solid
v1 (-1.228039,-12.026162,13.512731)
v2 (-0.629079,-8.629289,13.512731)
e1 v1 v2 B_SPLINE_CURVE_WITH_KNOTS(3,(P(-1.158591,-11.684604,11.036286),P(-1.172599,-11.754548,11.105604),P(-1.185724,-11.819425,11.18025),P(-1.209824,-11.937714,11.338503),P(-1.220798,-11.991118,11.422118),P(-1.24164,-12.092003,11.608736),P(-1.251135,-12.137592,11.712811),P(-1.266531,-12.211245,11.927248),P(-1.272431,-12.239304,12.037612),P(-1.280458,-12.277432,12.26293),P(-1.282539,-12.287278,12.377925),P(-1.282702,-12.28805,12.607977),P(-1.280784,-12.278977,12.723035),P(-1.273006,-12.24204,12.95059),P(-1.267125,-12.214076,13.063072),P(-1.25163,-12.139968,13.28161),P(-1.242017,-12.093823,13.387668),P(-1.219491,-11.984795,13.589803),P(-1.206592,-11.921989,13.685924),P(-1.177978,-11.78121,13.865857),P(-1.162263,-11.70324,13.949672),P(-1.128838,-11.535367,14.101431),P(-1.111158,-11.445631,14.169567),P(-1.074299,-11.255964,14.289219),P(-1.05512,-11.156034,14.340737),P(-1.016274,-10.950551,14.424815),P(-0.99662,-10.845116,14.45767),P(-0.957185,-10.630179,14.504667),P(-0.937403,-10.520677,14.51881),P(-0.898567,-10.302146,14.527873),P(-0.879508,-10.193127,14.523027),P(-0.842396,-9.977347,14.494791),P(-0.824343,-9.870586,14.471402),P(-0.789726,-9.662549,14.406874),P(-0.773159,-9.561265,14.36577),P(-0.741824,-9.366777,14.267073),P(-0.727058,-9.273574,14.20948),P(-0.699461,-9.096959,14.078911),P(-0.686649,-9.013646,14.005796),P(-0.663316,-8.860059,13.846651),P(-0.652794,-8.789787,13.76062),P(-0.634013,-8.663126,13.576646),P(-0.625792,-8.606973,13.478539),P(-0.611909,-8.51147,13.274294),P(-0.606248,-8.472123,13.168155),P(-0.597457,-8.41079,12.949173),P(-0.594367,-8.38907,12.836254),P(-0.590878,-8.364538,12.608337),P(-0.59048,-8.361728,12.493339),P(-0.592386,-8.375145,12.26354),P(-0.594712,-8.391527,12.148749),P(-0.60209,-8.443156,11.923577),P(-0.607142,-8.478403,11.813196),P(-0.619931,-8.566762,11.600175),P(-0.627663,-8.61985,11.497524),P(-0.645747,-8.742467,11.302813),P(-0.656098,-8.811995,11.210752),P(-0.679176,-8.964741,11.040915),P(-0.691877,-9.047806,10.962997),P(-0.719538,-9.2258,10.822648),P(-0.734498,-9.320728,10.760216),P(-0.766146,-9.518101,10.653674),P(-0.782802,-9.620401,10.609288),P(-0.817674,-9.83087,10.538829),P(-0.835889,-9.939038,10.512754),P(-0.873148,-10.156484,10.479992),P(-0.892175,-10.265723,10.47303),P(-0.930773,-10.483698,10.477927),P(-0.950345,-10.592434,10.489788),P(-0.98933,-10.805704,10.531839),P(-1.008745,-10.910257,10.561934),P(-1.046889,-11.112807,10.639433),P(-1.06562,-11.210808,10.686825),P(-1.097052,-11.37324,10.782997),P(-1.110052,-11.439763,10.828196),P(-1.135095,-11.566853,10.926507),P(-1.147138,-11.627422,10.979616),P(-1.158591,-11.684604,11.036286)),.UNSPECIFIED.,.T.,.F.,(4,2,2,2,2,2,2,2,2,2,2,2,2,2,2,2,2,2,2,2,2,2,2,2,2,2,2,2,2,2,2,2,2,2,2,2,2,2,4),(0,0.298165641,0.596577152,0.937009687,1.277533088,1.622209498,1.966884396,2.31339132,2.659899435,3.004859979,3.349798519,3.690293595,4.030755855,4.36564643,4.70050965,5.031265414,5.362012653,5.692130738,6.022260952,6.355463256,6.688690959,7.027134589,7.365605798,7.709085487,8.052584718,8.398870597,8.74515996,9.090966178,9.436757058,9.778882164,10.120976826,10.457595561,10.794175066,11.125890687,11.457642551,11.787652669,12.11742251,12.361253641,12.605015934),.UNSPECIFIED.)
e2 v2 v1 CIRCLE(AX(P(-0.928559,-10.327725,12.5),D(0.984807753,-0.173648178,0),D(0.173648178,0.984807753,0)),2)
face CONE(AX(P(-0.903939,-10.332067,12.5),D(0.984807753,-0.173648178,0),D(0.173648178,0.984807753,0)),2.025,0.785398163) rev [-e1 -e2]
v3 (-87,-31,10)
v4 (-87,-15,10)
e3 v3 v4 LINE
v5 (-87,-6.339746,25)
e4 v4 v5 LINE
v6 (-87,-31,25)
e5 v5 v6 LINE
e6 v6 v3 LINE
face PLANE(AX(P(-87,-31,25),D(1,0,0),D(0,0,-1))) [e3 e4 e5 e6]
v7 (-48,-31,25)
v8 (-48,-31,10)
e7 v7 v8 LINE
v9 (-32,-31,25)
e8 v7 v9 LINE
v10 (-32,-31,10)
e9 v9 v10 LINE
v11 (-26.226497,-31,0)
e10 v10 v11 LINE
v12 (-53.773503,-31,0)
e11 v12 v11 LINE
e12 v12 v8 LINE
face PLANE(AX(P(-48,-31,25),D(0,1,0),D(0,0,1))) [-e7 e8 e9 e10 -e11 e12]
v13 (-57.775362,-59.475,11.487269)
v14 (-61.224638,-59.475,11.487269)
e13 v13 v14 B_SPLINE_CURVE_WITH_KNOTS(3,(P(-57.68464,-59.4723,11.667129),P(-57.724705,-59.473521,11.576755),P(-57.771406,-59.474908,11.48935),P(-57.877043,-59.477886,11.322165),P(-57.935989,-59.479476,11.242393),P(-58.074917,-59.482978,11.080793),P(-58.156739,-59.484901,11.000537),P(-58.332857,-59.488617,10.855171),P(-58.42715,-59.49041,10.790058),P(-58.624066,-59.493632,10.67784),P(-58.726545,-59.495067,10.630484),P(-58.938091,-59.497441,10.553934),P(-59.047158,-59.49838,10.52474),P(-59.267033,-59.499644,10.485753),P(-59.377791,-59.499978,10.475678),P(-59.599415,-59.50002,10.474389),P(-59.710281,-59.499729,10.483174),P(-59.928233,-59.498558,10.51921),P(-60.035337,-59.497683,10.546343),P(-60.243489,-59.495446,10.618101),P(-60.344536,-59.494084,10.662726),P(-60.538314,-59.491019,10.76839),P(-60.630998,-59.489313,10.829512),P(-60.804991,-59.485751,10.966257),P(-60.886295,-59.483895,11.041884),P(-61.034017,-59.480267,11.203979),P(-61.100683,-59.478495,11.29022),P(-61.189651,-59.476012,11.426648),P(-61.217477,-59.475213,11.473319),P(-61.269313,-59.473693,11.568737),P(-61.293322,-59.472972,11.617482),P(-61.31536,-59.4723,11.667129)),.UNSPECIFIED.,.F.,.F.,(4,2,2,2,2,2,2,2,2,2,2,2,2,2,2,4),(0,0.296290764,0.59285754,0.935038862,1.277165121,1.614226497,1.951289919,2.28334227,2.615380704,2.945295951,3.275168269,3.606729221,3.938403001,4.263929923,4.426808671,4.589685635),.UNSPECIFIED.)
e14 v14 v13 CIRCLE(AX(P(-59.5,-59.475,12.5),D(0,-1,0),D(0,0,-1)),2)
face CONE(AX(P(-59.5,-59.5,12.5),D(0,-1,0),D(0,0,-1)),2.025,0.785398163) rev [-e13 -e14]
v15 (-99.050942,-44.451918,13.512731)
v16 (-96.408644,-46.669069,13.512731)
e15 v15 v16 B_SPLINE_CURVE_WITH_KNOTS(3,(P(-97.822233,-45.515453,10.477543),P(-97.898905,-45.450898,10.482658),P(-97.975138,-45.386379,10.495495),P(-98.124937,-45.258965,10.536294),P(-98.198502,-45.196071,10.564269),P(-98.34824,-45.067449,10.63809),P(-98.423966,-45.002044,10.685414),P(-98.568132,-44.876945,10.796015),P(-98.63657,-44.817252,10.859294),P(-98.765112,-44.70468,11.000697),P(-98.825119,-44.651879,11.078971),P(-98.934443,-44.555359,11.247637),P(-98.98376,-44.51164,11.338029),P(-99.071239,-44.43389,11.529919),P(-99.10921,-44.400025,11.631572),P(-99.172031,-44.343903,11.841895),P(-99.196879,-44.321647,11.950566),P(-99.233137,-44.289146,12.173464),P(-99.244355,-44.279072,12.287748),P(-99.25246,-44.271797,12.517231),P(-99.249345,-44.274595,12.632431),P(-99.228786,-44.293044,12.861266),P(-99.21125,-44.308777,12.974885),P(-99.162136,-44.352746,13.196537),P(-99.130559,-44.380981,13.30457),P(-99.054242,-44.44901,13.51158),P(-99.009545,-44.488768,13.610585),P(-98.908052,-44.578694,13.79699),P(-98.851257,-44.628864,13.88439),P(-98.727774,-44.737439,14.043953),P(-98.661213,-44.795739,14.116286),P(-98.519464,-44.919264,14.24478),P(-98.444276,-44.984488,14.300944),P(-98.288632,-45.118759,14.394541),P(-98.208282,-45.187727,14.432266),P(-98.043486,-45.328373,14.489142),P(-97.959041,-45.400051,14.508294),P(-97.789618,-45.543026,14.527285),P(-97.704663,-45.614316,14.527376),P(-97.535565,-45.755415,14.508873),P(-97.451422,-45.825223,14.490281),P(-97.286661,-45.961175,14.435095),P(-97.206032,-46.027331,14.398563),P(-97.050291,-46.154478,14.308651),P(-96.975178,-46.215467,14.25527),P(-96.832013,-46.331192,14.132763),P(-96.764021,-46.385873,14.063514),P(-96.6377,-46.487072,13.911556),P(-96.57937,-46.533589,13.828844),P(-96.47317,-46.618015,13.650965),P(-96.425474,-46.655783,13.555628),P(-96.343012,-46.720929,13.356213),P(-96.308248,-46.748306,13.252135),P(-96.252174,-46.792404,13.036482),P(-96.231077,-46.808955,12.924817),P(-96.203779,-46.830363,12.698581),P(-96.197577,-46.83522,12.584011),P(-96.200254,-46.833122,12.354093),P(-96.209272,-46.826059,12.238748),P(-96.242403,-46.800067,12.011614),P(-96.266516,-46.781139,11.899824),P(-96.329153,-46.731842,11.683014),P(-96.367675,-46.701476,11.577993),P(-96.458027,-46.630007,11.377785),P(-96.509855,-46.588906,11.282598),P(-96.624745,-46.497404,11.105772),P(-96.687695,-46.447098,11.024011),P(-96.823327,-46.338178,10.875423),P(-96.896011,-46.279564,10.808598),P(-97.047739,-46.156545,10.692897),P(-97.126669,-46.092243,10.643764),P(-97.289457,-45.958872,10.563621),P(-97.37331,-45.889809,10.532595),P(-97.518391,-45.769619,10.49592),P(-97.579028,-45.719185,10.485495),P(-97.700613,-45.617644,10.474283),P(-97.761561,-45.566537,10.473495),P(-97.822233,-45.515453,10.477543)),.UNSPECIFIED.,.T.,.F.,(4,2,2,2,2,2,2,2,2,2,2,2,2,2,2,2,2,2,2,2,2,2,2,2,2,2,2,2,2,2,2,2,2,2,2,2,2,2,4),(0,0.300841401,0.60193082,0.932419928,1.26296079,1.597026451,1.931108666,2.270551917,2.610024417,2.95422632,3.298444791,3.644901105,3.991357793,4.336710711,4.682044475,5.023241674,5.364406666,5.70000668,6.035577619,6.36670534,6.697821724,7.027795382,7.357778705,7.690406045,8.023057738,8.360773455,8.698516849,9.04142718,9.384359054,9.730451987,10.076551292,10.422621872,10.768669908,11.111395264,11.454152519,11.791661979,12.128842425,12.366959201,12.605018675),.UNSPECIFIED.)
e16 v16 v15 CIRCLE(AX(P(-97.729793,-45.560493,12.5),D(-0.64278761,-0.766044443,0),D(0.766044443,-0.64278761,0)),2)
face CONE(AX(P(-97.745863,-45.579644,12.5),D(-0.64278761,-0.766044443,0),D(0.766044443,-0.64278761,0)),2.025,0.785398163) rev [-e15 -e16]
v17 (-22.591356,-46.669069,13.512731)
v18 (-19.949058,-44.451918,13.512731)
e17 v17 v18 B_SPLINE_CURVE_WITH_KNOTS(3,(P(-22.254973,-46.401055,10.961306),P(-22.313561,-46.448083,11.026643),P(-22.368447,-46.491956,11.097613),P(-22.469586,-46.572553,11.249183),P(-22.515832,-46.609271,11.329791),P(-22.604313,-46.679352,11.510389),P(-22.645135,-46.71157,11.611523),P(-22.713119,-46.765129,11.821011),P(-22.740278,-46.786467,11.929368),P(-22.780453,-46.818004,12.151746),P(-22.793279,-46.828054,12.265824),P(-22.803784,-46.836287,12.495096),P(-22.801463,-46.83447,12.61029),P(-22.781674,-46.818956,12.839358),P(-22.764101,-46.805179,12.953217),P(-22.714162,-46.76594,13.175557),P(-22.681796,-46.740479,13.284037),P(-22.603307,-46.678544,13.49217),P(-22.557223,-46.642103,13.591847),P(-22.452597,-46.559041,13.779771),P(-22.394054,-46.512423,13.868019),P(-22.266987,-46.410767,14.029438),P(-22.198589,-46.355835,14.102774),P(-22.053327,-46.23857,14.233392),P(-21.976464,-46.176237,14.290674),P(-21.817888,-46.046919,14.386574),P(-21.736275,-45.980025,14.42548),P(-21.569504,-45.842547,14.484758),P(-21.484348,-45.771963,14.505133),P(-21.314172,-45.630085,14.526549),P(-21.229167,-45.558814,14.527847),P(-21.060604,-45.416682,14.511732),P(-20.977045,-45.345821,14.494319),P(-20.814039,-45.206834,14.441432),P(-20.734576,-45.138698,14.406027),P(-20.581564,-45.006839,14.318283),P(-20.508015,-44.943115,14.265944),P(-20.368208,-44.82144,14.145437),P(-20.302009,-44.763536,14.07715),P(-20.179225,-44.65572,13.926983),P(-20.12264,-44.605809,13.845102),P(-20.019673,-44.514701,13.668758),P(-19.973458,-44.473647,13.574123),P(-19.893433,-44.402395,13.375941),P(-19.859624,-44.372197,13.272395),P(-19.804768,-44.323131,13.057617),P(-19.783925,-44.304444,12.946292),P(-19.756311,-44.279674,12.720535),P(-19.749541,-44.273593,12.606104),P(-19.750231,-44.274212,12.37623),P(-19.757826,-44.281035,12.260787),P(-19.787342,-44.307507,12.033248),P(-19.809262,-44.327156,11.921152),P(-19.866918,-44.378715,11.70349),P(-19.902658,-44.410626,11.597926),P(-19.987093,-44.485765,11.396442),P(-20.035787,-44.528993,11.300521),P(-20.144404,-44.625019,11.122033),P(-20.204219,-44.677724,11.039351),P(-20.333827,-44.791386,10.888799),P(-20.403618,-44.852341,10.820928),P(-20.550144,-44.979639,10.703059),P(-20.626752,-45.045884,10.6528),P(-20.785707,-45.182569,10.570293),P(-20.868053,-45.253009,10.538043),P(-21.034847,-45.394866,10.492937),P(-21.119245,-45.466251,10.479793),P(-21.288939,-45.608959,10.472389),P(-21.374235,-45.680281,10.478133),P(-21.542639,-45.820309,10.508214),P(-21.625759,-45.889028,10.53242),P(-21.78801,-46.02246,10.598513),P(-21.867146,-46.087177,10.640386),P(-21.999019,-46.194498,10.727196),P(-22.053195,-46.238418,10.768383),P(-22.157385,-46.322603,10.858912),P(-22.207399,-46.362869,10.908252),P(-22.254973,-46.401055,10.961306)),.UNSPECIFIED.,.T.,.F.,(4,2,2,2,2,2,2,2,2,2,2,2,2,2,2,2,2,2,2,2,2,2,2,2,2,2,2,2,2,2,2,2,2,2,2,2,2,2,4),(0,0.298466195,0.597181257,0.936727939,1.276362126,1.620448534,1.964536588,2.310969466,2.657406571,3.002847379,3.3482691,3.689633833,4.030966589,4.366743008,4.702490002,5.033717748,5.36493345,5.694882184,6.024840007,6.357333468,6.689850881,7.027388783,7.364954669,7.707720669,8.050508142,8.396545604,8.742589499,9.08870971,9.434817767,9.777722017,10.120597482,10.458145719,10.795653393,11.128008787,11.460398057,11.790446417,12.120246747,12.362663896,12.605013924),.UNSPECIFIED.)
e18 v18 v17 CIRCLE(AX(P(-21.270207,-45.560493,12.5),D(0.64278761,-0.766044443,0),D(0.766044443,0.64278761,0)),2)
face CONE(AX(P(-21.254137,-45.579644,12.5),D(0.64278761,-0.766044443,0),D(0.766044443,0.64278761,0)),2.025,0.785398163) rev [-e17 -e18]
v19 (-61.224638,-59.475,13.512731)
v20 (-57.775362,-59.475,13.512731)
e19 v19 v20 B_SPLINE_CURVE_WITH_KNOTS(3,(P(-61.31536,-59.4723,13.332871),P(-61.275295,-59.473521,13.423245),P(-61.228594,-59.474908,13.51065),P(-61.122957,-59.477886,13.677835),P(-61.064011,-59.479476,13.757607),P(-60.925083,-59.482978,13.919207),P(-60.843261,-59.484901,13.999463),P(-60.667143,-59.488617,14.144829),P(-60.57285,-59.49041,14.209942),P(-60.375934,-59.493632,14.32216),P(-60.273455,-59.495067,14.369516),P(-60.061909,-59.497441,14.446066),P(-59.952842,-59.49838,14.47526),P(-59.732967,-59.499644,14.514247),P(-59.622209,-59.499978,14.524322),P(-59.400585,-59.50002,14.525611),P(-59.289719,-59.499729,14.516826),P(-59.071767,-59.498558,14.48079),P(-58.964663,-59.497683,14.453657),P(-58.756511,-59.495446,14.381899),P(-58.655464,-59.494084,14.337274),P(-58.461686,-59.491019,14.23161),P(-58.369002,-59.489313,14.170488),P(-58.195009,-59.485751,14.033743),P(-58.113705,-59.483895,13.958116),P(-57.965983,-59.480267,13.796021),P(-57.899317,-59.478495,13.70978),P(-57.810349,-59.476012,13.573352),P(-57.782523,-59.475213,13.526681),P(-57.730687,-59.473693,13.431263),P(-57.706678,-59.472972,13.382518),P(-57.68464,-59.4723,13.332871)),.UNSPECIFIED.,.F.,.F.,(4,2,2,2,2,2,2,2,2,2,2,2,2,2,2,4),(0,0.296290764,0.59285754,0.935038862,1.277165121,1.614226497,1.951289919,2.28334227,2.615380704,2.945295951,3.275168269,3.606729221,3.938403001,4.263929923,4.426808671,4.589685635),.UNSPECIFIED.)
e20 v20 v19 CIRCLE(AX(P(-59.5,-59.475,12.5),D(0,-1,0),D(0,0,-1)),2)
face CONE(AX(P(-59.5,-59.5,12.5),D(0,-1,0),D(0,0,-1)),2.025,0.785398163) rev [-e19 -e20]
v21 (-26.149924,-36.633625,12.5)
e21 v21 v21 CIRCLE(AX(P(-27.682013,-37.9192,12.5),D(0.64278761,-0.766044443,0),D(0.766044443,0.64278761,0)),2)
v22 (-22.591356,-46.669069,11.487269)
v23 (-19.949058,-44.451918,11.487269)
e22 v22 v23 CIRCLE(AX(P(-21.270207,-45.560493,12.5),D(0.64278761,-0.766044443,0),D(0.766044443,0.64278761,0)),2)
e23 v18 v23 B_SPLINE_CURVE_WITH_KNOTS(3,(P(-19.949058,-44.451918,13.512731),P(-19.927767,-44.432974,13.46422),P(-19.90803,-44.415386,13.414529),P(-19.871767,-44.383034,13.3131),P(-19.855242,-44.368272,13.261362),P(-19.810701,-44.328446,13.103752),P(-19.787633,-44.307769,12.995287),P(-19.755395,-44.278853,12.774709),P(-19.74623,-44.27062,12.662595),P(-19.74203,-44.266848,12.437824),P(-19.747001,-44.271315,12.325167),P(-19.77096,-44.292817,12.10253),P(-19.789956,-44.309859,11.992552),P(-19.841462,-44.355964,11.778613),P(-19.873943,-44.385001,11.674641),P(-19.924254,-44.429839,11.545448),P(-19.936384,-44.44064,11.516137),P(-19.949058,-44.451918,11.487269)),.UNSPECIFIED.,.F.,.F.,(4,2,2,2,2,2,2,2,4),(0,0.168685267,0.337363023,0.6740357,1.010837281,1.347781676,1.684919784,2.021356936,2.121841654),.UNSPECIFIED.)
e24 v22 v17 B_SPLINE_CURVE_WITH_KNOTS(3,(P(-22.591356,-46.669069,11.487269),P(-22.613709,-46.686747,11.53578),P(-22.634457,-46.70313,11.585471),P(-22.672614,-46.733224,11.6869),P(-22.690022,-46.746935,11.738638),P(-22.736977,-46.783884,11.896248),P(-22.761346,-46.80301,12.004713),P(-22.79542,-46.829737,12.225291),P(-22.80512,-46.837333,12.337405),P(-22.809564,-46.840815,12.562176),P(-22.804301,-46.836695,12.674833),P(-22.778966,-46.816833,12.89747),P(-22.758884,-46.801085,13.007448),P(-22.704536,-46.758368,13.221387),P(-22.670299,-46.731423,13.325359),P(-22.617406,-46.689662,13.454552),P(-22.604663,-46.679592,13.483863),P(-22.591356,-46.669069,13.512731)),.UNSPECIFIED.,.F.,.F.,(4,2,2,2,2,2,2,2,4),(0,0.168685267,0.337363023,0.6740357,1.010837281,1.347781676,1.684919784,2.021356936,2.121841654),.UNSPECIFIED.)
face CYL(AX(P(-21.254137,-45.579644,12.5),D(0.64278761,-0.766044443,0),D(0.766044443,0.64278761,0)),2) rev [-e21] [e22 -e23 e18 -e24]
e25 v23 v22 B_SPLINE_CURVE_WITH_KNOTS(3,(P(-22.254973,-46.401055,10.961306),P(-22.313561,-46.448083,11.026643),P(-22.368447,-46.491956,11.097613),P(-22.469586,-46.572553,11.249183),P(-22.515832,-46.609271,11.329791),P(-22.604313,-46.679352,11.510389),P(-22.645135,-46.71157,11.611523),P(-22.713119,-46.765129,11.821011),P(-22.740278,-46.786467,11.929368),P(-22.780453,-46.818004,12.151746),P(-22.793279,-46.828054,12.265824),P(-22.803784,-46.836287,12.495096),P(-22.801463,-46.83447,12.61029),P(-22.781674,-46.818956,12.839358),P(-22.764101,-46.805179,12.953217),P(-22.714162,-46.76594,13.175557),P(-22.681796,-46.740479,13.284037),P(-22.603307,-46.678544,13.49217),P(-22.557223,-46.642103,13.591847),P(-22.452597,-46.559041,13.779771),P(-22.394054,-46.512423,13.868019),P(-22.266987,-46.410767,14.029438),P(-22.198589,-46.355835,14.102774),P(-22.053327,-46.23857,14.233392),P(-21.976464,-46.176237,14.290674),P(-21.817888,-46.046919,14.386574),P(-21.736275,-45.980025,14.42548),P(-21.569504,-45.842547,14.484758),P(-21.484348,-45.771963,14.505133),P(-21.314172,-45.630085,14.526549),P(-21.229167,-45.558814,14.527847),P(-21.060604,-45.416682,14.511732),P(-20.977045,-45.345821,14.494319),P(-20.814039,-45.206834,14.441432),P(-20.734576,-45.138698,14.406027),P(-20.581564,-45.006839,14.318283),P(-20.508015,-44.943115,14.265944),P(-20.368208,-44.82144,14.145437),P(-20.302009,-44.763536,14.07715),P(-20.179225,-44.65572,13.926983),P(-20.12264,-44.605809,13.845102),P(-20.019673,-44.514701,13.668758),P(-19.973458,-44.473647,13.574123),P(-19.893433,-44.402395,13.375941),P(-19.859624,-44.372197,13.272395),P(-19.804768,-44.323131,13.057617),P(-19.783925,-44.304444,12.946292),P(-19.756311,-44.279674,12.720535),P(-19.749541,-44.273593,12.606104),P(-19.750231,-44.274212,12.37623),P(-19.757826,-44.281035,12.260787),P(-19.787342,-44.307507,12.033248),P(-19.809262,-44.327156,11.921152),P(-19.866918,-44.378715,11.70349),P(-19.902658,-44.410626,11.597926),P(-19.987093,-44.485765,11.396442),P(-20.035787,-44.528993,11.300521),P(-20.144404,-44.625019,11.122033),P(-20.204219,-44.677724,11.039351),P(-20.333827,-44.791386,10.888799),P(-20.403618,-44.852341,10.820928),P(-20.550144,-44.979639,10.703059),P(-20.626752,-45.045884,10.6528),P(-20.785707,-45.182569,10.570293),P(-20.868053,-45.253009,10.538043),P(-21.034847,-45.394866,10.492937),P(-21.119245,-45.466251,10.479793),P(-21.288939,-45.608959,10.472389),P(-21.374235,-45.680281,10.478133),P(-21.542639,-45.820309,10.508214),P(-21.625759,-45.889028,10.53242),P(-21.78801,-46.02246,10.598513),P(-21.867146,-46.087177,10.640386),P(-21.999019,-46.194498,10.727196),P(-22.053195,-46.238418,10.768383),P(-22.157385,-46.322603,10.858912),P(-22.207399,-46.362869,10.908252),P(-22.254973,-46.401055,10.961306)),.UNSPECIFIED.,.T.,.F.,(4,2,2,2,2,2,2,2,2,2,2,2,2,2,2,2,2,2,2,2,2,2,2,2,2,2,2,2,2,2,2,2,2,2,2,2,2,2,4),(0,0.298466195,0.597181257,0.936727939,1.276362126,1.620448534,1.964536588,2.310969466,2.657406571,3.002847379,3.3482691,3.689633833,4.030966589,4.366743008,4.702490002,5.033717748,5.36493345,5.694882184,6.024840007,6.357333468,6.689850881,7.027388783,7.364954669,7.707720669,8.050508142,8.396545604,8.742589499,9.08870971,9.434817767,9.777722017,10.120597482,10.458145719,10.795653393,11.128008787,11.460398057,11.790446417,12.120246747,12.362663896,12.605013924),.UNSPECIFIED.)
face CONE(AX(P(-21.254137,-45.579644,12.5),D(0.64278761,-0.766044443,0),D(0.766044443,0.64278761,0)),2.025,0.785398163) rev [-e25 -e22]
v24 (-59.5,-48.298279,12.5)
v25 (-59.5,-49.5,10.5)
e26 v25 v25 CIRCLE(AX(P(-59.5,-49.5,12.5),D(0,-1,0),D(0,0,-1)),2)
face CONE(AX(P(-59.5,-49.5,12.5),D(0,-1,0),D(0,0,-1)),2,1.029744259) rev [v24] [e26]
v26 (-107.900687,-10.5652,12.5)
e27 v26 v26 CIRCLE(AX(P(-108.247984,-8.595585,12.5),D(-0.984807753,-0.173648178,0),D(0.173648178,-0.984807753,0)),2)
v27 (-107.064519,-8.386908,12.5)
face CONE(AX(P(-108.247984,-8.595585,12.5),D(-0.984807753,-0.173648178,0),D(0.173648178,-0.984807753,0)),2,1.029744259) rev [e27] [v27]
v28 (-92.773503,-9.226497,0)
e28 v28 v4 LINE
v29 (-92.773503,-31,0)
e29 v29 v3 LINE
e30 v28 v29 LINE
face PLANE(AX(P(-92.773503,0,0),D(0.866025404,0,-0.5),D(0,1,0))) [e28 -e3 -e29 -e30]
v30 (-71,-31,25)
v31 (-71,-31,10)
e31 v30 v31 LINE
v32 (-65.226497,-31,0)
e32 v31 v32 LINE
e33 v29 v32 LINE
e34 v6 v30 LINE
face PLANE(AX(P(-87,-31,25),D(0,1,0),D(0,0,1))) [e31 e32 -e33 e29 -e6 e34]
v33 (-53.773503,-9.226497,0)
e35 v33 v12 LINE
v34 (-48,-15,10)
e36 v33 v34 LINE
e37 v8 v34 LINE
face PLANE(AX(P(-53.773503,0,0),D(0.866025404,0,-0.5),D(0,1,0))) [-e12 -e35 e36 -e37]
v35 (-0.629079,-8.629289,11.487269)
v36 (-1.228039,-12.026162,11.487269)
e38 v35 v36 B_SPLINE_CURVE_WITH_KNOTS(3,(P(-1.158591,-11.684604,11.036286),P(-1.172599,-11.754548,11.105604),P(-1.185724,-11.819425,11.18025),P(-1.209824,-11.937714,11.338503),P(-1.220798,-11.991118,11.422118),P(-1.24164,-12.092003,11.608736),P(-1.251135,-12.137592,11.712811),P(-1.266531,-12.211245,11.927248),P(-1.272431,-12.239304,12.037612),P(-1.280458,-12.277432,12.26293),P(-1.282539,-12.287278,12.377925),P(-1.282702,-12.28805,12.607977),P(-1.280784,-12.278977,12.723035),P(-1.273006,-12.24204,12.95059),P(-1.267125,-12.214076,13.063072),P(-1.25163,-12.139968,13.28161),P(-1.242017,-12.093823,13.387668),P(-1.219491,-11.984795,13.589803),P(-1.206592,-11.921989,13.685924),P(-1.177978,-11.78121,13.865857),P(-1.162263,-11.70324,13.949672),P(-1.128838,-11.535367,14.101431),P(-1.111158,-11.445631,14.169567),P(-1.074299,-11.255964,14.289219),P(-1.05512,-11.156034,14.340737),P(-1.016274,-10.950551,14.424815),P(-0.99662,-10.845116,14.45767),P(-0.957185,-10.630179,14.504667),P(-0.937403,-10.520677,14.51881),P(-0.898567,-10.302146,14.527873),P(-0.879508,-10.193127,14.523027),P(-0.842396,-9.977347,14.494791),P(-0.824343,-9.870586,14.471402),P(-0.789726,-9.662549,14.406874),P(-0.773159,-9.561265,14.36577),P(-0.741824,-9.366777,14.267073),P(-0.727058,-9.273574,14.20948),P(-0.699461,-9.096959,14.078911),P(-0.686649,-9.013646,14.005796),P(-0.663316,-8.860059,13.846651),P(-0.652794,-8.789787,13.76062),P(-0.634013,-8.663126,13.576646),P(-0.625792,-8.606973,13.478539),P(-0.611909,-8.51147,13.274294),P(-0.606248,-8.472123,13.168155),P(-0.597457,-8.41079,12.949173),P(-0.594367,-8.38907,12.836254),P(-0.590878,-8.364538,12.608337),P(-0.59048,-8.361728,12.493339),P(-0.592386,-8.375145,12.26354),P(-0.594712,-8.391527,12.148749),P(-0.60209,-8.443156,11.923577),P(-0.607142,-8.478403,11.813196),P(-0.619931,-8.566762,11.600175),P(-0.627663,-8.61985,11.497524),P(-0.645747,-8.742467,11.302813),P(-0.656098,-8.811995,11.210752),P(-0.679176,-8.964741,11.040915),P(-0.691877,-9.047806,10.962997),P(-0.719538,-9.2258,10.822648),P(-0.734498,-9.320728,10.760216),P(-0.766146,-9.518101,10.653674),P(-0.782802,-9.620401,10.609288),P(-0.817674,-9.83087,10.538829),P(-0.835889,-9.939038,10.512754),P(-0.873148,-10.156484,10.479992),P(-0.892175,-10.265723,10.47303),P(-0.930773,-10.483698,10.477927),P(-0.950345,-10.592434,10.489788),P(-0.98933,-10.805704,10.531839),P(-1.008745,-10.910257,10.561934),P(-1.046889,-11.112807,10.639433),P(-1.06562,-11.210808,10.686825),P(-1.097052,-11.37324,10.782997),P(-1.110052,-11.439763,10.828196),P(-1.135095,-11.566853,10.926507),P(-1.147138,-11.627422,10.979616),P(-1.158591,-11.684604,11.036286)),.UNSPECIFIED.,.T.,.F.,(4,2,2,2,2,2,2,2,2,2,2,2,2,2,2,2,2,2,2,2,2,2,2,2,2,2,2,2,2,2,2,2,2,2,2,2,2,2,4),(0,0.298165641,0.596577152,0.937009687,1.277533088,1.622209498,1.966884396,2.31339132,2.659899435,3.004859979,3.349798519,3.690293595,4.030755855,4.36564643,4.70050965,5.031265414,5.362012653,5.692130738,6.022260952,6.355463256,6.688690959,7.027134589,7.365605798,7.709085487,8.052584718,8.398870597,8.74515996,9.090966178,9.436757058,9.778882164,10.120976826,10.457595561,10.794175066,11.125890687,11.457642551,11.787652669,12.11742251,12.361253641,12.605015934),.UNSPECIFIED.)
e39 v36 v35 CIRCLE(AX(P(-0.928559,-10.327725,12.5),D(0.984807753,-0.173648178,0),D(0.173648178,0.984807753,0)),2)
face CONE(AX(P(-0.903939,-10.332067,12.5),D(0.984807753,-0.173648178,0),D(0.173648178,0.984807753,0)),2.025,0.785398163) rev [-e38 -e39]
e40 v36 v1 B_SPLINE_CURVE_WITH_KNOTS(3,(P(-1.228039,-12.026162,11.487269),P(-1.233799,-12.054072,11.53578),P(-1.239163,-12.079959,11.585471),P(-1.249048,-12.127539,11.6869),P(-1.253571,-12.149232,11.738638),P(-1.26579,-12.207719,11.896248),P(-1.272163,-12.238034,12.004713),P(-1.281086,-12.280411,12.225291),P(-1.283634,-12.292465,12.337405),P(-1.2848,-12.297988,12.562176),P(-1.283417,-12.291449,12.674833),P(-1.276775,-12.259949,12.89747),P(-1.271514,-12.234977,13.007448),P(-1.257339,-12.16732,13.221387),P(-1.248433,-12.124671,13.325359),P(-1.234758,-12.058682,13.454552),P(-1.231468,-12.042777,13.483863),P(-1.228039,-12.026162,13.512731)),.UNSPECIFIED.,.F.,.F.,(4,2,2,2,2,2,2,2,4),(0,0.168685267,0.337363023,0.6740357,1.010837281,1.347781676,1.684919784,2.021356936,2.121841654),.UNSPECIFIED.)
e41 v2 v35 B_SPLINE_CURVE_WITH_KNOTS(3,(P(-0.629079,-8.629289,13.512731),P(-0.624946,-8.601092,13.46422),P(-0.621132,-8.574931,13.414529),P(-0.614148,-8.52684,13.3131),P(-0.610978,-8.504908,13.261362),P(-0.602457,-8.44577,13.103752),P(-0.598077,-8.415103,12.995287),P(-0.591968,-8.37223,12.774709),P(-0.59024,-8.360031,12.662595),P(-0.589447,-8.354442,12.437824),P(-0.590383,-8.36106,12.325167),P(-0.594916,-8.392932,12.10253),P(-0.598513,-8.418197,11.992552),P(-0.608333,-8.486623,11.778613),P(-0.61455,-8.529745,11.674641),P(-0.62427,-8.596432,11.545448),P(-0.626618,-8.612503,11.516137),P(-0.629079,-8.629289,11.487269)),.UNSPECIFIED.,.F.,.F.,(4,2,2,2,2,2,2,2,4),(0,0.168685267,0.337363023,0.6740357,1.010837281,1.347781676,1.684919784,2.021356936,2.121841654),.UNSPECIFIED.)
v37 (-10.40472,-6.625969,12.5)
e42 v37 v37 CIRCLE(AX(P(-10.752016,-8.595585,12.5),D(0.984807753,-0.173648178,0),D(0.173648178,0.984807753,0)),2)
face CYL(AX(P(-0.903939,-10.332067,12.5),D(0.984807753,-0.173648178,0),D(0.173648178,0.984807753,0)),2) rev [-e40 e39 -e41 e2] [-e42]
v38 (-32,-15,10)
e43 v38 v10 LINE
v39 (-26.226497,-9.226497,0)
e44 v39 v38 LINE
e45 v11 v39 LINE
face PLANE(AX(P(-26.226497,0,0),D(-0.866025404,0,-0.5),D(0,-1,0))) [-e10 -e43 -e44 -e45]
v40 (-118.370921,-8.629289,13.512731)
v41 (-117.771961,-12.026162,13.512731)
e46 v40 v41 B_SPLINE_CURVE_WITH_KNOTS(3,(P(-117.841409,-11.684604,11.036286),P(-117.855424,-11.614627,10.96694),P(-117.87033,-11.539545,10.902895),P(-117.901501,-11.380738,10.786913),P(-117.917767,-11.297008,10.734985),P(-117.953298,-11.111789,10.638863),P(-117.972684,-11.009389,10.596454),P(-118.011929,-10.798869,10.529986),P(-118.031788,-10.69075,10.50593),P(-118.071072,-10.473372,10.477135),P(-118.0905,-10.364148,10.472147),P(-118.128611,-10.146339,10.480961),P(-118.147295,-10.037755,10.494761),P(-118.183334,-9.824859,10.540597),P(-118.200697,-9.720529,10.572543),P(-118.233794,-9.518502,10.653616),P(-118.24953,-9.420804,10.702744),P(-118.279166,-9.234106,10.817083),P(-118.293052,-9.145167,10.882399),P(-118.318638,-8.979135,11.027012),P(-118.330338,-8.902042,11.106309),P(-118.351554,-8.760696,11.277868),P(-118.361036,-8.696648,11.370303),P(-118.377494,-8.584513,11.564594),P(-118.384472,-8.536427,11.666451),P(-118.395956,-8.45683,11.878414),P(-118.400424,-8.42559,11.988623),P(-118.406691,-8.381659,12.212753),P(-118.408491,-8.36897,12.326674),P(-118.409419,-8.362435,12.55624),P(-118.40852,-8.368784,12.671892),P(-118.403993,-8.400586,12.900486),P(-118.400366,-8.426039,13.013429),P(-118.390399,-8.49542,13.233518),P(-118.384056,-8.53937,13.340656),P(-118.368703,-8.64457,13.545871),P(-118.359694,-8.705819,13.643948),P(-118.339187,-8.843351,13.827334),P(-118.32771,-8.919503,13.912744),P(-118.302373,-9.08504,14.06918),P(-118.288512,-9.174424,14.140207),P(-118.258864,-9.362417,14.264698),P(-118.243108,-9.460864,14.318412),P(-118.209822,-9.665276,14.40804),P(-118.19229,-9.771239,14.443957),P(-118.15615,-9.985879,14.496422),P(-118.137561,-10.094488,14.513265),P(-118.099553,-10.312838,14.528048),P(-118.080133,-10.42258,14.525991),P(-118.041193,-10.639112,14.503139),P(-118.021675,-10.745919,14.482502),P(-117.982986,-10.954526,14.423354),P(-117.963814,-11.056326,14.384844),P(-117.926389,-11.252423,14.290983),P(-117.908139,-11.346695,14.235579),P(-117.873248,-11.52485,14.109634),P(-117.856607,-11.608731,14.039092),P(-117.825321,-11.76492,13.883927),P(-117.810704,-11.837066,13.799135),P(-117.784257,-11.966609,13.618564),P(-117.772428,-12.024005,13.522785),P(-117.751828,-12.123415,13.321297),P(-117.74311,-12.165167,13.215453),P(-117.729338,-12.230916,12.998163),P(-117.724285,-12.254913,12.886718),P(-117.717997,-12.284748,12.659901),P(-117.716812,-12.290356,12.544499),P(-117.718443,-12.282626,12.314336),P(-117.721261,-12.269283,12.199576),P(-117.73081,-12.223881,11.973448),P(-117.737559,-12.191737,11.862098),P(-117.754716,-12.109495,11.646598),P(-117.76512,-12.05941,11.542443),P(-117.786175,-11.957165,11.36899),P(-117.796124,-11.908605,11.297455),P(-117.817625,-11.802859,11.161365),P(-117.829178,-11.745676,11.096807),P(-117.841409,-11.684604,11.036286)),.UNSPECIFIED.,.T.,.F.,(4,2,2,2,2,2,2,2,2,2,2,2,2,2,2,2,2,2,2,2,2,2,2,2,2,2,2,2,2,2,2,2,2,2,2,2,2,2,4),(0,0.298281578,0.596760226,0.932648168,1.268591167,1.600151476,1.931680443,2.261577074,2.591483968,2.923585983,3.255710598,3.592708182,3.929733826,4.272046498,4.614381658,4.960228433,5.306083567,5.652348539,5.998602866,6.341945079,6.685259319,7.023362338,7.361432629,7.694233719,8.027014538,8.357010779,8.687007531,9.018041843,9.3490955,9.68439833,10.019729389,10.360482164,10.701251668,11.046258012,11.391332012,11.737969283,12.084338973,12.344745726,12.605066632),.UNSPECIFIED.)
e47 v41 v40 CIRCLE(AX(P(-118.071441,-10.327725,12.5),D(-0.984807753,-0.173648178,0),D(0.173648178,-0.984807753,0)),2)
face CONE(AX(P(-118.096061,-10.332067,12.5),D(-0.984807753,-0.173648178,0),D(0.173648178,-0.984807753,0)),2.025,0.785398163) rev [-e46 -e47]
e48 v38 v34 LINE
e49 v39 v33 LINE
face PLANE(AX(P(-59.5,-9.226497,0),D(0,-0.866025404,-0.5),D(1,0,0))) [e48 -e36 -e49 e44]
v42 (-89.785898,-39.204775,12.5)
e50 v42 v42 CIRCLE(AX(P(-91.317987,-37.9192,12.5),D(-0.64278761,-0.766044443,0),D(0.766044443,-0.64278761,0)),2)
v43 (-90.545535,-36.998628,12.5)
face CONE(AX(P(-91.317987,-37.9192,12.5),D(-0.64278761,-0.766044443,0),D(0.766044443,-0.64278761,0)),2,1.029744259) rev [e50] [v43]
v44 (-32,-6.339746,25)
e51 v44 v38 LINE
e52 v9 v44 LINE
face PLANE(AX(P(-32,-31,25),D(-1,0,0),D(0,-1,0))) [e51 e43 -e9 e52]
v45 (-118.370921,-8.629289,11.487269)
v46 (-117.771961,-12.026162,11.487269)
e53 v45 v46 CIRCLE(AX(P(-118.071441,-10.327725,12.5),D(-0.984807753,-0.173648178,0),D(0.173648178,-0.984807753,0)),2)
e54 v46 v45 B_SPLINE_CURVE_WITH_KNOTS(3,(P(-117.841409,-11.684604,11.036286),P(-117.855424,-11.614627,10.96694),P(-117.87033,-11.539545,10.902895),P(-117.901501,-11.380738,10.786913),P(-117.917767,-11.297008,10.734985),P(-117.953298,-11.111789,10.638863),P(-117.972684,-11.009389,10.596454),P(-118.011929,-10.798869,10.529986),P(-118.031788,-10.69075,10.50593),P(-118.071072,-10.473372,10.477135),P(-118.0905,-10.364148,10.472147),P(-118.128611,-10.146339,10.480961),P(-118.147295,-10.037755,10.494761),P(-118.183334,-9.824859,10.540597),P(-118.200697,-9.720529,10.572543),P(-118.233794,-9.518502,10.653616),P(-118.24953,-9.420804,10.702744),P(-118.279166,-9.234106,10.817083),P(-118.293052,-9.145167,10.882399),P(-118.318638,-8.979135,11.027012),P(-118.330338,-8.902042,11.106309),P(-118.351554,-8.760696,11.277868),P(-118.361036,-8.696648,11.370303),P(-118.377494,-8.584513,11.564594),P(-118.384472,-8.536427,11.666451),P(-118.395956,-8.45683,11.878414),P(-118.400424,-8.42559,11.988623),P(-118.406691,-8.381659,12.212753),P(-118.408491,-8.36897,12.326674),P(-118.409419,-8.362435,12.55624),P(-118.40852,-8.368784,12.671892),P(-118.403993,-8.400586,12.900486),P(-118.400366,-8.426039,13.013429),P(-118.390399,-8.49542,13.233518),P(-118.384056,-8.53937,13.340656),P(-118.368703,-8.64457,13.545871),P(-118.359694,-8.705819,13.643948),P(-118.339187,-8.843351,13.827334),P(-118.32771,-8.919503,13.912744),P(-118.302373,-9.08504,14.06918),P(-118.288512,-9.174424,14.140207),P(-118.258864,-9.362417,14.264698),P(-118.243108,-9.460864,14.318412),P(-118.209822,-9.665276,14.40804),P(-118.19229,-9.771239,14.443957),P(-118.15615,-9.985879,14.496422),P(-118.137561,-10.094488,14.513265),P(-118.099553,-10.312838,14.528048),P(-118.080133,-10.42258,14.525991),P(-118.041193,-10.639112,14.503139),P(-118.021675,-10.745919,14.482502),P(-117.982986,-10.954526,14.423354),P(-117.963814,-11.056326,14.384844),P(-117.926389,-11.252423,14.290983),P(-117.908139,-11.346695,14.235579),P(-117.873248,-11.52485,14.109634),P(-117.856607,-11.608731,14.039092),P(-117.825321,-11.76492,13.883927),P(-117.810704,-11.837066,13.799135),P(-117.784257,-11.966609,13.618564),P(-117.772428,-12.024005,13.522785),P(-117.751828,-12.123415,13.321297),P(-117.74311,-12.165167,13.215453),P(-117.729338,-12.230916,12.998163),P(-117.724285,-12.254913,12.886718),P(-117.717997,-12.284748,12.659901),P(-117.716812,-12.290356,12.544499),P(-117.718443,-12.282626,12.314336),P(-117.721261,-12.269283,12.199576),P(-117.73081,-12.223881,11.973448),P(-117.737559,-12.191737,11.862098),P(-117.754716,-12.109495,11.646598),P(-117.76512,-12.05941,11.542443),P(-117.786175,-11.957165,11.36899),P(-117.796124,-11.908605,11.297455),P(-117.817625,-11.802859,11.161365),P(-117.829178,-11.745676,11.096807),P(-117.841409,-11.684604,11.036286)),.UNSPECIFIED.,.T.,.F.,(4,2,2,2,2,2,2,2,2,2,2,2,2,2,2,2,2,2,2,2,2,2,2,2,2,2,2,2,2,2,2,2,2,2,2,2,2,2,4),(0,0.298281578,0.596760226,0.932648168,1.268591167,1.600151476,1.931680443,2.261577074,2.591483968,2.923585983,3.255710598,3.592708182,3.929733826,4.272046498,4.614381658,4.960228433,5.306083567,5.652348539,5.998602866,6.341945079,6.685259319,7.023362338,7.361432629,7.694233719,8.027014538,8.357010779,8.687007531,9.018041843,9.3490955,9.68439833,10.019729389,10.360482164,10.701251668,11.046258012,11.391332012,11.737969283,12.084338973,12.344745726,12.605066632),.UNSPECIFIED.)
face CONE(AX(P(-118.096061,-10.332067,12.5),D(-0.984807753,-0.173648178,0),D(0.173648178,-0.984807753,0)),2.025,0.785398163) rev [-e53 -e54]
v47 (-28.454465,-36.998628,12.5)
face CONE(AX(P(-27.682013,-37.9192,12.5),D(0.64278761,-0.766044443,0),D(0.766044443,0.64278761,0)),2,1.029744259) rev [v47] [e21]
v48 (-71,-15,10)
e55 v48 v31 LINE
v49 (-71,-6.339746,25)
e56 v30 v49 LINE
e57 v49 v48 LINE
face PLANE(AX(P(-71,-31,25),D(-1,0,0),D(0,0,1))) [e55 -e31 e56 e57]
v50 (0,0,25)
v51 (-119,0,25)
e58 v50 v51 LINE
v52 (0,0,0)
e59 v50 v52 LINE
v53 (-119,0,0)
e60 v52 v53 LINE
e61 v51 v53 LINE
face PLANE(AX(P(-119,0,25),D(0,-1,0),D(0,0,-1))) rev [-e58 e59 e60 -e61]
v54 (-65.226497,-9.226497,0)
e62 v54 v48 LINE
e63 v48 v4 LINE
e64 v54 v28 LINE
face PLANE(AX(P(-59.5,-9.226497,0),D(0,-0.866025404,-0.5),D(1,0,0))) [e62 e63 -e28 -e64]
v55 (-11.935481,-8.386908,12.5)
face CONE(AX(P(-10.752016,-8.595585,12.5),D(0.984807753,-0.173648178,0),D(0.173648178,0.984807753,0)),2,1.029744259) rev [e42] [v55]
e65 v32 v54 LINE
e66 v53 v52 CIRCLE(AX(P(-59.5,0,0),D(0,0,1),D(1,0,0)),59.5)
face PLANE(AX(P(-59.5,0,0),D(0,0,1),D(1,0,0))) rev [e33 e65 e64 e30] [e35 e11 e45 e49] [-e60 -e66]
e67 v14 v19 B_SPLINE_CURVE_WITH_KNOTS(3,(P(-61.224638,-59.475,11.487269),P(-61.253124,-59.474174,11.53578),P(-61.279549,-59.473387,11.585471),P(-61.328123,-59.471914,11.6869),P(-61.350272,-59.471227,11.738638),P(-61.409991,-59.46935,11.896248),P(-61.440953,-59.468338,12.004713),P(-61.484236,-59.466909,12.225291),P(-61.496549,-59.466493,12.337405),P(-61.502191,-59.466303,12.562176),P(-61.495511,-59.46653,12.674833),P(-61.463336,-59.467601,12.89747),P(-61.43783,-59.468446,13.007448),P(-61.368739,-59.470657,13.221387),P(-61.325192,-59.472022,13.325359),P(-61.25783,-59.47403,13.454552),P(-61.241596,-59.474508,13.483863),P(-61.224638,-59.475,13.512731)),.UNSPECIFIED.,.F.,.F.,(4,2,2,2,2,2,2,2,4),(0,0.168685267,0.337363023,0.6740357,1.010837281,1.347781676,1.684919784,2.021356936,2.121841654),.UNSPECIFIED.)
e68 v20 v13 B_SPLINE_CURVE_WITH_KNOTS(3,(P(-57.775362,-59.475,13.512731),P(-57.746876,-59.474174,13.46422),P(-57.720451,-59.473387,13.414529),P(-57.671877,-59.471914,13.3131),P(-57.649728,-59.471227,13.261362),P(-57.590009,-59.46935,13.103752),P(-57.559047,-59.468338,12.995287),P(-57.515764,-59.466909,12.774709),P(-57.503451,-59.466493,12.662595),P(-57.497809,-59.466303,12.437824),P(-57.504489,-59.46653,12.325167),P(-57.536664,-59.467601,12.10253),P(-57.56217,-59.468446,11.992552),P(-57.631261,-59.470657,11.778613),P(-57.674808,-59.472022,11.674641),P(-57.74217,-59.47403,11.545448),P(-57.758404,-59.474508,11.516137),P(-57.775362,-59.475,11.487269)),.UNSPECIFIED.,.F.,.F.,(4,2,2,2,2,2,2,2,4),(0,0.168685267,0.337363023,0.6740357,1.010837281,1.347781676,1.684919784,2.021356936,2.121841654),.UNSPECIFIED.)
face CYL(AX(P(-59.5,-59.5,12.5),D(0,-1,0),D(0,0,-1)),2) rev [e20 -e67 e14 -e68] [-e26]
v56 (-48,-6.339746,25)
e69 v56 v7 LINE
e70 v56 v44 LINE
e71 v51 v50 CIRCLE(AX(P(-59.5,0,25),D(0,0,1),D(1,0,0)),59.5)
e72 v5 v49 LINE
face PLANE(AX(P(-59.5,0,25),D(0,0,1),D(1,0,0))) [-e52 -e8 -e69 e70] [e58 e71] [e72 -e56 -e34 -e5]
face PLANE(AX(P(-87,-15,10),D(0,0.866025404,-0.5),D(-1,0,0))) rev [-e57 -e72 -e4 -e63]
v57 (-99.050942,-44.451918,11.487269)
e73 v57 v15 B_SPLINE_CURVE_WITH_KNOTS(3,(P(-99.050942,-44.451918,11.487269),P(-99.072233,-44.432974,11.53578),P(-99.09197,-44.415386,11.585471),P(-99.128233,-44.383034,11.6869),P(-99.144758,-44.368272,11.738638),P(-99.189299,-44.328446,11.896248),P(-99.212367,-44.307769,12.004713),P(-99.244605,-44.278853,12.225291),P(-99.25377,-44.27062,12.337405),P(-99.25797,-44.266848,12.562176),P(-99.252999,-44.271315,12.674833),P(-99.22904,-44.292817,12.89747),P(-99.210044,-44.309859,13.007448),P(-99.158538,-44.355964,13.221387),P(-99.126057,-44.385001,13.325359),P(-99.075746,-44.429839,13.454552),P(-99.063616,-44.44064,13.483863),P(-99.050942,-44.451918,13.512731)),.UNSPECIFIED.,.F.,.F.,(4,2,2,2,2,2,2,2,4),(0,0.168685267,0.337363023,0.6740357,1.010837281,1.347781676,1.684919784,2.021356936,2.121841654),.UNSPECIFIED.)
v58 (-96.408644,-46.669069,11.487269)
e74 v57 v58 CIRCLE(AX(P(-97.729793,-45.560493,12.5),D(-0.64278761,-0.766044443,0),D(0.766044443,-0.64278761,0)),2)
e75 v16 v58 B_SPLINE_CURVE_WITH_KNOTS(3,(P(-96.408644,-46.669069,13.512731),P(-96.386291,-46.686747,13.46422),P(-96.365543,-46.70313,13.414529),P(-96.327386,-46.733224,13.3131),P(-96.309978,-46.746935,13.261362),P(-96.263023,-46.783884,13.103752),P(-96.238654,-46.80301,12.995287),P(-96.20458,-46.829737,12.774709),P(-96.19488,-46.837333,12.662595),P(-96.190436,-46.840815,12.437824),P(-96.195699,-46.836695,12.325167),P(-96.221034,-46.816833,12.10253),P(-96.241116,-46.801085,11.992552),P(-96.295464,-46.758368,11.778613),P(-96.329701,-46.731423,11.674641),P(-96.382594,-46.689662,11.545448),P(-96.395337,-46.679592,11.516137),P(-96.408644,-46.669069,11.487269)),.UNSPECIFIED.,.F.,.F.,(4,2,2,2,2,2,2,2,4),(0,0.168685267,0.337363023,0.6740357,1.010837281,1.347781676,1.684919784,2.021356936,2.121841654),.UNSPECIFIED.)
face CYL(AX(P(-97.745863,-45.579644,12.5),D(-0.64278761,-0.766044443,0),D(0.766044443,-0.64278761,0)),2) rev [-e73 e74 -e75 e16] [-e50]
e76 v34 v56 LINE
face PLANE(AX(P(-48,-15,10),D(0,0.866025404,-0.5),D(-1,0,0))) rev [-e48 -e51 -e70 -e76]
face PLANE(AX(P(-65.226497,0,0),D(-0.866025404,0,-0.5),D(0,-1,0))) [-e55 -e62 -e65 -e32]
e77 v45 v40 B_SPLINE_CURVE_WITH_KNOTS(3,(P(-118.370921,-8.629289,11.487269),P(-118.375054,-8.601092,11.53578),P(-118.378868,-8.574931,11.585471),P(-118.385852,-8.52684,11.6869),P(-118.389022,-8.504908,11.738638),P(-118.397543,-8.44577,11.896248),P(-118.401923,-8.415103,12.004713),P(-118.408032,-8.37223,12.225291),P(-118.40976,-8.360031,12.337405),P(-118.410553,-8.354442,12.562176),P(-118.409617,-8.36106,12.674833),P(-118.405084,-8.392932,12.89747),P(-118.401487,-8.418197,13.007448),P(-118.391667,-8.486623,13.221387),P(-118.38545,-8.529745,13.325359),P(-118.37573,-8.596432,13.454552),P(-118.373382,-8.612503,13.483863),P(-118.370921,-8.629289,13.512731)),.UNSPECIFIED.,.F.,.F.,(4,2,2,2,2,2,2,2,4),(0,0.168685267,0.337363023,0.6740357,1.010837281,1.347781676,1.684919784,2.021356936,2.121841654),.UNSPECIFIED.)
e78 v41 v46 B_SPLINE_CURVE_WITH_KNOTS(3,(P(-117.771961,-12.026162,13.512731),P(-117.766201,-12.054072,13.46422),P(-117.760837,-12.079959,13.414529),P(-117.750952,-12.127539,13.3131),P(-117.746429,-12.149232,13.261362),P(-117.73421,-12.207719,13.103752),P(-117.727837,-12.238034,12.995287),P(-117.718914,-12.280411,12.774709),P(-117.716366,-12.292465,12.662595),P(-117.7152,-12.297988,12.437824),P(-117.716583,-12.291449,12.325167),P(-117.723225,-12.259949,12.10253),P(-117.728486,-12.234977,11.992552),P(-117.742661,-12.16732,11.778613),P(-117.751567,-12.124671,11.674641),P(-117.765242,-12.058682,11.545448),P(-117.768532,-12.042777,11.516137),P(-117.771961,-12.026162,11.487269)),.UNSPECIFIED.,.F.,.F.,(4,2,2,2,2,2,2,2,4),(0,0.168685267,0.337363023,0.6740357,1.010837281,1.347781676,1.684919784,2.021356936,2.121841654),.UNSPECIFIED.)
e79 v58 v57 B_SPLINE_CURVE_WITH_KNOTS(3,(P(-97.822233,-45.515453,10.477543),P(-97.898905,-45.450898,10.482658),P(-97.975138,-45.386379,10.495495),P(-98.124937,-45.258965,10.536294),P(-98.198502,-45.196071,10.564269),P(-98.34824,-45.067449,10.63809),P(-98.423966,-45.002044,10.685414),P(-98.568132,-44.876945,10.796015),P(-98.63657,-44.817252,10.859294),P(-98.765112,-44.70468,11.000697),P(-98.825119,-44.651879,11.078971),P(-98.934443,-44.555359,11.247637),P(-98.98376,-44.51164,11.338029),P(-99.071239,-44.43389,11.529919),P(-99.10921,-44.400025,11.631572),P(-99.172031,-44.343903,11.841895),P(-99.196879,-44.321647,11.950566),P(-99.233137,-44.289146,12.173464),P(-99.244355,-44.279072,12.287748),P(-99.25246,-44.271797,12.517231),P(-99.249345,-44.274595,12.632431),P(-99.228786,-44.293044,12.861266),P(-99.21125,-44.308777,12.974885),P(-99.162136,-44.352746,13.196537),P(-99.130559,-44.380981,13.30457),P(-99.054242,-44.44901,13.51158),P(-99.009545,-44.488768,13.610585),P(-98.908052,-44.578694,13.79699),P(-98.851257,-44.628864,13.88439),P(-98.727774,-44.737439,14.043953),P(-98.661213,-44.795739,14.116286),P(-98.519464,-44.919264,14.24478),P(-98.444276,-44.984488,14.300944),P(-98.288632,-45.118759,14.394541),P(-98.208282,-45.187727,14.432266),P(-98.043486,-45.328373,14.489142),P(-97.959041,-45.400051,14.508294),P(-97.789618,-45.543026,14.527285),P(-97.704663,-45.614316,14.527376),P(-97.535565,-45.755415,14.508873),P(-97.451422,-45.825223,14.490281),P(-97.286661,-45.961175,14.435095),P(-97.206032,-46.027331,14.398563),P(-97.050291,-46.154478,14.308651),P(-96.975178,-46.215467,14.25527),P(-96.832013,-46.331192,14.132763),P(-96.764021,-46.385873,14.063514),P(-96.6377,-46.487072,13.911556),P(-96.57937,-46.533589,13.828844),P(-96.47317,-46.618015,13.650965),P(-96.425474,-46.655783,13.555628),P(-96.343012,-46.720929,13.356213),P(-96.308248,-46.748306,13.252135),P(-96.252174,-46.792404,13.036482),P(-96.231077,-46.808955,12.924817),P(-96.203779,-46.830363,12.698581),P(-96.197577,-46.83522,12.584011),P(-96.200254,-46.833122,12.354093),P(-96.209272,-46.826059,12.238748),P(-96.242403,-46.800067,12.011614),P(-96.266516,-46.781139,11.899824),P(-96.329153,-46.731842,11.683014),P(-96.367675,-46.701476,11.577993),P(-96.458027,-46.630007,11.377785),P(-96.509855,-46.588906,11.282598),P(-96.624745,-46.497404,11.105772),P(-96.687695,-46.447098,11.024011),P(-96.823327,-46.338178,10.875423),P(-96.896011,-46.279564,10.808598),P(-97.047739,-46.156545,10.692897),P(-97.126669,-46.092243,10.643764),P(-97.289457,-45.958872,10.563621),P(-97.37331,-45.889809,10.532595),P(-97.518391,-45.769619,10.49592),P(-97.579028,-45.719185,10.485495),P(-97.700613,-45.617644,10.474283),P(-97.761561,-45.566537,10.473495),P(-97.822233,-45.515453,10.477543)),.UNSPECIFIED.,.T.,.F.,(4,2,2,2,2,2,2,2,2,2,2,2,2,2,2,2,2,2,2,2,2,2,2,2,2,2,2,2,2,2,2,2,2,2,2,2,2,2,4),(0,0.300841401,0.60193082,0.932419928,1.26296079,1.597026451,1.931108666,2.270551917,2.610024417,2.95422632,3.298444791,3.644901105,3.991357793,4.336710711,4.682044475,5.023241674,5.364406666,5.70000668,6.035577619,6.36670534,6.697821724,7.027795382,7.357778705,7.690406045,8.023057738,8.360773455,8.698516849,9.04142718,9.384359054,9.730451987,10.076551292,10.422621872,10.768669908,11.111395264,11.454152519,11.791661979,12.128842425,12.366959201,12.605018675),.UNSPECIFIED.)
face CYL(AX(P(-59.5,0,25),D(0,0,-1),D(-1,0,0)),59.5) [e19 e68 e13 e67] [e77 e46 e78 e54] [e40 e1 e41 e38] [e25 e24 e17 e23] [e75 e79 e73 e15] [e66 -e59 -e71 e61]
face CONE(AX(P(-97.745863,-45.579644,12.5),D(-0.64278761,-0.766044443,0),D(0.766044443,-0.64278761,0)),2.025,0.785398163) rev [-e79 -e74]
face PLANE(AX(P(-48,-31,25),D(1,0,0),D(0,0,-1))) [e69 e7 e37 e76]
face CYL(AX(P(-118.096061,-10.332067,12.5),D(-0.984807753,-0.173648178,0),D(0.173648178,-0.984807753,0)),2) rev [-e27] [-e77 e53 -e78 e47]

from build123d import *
from OCP.BRepFilletAPI import BRepFilletAPI_MakeChamfer

# Parameters (mm, degrees)
SKETCH1_W           = 16
SKETCH1_H           = 16
BOSS_EXTRUDE1_DEPTH = 25
CIRPATTERN1_COUNT   = 5
CIRPATTERN1_ANGLE   = 160
CHAMFER1_SIZE       = 15
CHAMFER1_SIZE2      = 8.660254038
CHAMFER2_SIZE       = 5.773502692
CHAMFER2_SIZE_2     = 10


with BuildPart() as part:
    # Sketch1 → Boss-Extrude1 (new body)
    with BuildSketch(Plane.XY):
        with BuildLine():
            Line((-119, 0), (0, 0))
            ThreePointArc((0, 0), (-59.5, -59.5), (-119, 0))
        make_face()
        with Locations((-40, -23)):
            Rectangle(SKETCH1_W, SKETCH1_H, mode=Mode.SUBTRACT)
        with Locations((-79, -23)):
            Rectangle(SKETCH1_W, SKETCH1_H, mode=Mode.SUBTRACT)
    extrude(amount=BOSS_EXTRUDE1_DEPTH)

    # Sketch4 → Ø4.0mm Dowel Hole2 (revolve, cut)
    with BuildSketch(Plane(origin=(-0.903938696, -10.332066571, 12.5), x_dir=(0.1736481776669305, 0.9848077530122081, 0), z_dir=(0, 0, 1))):
        Polygon((0, 0), (0, 11.201721238), (2, 10), (2, 0.025), (2.025, 0), align=None)
    f_4_0mm_dowel_hole2 = revolve(axis=Axis((5.349590536, -11.434732499, 12.5), (-0.9848077530122081, 0.1736481776669305, 0)), mode=Mode.SUBTRACT)

    # CirPattern1: Ø4.0mm Dowel Hole2 ×5 about axis
    cirpattern1_axis = Axis((-59.5, 0, 0), (0, 0, -1))
    for i in range(1, CIRPATTERN1_COUNT):
        add(f_4_0mm_dowel_hole2.rotate(cirpattern1_axis, i * CIRPATTERN1_ANGLE / (CIRPATTERN1_COUNT - 1)), mode=Mode.SUBTRACT)

    # Chamfer1: one chamfer whose edges measure the first distance from different faces: ONE call of the kernel's chamfer builder (chamfer() names one face for all edges)
    chamfer1_edges_1 = [part.edges().sort_by_distance(p)[0] for p in [
        (-40, -15, 25),
    ]]
    chamfer1_side_1 = [part.faces().sort_by_distance(p)[0] for p in [
        (-40, -15, 12.5),
    ]]
    chamfer1_edges_2 = [part.edges().sort_by_distance(p)[0] for p in [
        (-79, -15, 25),
    ]]
    chamfer1_side_2 = [part.faces().sort_by_distance(p)[0] for p in [
        (-79, -15, 12.5),
    ]]
    chamfer1 = BRepFilletAPI_MakeChamfer(part.part.solid().wrapped)
    for e in chamfer1_edges_1:
        chamfer1.Add(CHAMFER1_SIZE, CHAMFER1_SIZE2, e.wrapped, chamfer1_side_1[0].wrapped)  # the first distance lies on this face
    for e in chamfer1_edges_2:
        chamfer1.Add(CHAMFER1_SIZE, CHAMFER1_SIZE2, e.wrapped, chamfer1_side_2[0].wrapped)  # the first distance lies on this face
    add(Compound.cast(chamfer1.Shape()), mode=Mode.REPLACE)

    # Chamfer2
    chamfer2_edges_1 = [part.edges().sort_by_distance(p)[0] for p in [
        (-48, -23, 0),
    ]]
    chamfer2_side_1 = [part.faces().sort_by_distance(p)[0] for p in [
        (-48.115470054, -23, 0),
    ]]
    chamfer2_edges_2 = [part.edges().sort_by_distance(p)[0] for p in [
        (-40, -15, 0),
    ]]
    chamfer2_side_2 = [part.faces().sort_by_distance(p)[0] for p in [
        (-40, -14.884529946, 0),
    ]]
    chamfer2_edges_3 = [part.edges().sort_by_distance(p)[0] for p in [
        (-32, -23, 0),
    ]]
    chamfer2_side_3 = [part.faces().sort_by_distance(p)[0] for p in [
        (-31.884529946, -23, 0),
    ]]
    chamfer2_edges_4 = [part.edges().sort_by_distance(p)[0] for p in [
        (-87, -23, 0),
    ]]
    chamfer2_side_4 = [part.faces().sort_by_distance(p)[0] for p in [
        (-87, -23, 0.115470054),
    ]]
    chamfer2_edges_5 = [part.edges().sort_by_distance(p)[0] for p in [
        (-79, -15, 0),
    ]]
    chamfer2_side_5 = [part.faces().sort_by_distance(p)[0] for p in [
        (-79, -14.884529946, 0),
    ]]
    chamfer2_edges_6 = [part.edges().sort_by_distance(p)[0] for p in [
        (-71, -23, 0),
    ]]
    chamfer2_side_6 = [part.faces().sort_by_distance(p)[0] for p in [
        (-70.884529946, -23, 0),
    ]]
    chamfer2 = BRepFilletAPI_MakeChamfer(part.part.solid().wrapped)
    for e in chamfer2_edges_1:
        chamfer2.Add(CHAMFER2_SIZE - 0.0001, CHAMFER2_SIZE_2 - 0.0001, e.wrapped, chamfer2_side_1[0].wrapped)
    for e in chamfer2_edges_2:
        chamfer2.Add(CHAMFER2_SIZE - 0.0001, CHAMFER2_SIZE_2 - 0.0001, e.wrapped, chamfer2_side_2[0].wrapped)
    for e in chamfer2_edges_3:
        chamfer2.Add(CHAMFER2_SIZE - 0.0001, CHAMFER2_SIZE_2 - 0.0001, e.wrapped, chamfer2_side_3[0].wrapped)
    for e in chamfer2_edges_4:
        chamfer2.Add(CHAMFER2_SIZE_2 - 0.0001, CHAMFER2_SIZE - 0.0001, e.wrapped, chamfer2_side_4[0].wrapped)
    for e in chamfer2_edges_5:
        chamfer2.Add(CHAMFER2_SIZE - 0.0001, CHAMFER2_SIZE_2 - 0.0001, e.wrapped, chamfer2_side_5[0].wrapped)
    for e in chamfer2_edges_6:
        chamfer2.Add(CHAMFER2_SIZE - 0.0001, CHAMFER2_SIZE_2 - 0.0001, e.wrapped, chamfer2_side_6[0].wrapped)
    add(Compound.cast(chamfer2.Shape()), mode=Mode.REPLACE)  # a hair under: the kernel refuses the full size


solid = part.part
